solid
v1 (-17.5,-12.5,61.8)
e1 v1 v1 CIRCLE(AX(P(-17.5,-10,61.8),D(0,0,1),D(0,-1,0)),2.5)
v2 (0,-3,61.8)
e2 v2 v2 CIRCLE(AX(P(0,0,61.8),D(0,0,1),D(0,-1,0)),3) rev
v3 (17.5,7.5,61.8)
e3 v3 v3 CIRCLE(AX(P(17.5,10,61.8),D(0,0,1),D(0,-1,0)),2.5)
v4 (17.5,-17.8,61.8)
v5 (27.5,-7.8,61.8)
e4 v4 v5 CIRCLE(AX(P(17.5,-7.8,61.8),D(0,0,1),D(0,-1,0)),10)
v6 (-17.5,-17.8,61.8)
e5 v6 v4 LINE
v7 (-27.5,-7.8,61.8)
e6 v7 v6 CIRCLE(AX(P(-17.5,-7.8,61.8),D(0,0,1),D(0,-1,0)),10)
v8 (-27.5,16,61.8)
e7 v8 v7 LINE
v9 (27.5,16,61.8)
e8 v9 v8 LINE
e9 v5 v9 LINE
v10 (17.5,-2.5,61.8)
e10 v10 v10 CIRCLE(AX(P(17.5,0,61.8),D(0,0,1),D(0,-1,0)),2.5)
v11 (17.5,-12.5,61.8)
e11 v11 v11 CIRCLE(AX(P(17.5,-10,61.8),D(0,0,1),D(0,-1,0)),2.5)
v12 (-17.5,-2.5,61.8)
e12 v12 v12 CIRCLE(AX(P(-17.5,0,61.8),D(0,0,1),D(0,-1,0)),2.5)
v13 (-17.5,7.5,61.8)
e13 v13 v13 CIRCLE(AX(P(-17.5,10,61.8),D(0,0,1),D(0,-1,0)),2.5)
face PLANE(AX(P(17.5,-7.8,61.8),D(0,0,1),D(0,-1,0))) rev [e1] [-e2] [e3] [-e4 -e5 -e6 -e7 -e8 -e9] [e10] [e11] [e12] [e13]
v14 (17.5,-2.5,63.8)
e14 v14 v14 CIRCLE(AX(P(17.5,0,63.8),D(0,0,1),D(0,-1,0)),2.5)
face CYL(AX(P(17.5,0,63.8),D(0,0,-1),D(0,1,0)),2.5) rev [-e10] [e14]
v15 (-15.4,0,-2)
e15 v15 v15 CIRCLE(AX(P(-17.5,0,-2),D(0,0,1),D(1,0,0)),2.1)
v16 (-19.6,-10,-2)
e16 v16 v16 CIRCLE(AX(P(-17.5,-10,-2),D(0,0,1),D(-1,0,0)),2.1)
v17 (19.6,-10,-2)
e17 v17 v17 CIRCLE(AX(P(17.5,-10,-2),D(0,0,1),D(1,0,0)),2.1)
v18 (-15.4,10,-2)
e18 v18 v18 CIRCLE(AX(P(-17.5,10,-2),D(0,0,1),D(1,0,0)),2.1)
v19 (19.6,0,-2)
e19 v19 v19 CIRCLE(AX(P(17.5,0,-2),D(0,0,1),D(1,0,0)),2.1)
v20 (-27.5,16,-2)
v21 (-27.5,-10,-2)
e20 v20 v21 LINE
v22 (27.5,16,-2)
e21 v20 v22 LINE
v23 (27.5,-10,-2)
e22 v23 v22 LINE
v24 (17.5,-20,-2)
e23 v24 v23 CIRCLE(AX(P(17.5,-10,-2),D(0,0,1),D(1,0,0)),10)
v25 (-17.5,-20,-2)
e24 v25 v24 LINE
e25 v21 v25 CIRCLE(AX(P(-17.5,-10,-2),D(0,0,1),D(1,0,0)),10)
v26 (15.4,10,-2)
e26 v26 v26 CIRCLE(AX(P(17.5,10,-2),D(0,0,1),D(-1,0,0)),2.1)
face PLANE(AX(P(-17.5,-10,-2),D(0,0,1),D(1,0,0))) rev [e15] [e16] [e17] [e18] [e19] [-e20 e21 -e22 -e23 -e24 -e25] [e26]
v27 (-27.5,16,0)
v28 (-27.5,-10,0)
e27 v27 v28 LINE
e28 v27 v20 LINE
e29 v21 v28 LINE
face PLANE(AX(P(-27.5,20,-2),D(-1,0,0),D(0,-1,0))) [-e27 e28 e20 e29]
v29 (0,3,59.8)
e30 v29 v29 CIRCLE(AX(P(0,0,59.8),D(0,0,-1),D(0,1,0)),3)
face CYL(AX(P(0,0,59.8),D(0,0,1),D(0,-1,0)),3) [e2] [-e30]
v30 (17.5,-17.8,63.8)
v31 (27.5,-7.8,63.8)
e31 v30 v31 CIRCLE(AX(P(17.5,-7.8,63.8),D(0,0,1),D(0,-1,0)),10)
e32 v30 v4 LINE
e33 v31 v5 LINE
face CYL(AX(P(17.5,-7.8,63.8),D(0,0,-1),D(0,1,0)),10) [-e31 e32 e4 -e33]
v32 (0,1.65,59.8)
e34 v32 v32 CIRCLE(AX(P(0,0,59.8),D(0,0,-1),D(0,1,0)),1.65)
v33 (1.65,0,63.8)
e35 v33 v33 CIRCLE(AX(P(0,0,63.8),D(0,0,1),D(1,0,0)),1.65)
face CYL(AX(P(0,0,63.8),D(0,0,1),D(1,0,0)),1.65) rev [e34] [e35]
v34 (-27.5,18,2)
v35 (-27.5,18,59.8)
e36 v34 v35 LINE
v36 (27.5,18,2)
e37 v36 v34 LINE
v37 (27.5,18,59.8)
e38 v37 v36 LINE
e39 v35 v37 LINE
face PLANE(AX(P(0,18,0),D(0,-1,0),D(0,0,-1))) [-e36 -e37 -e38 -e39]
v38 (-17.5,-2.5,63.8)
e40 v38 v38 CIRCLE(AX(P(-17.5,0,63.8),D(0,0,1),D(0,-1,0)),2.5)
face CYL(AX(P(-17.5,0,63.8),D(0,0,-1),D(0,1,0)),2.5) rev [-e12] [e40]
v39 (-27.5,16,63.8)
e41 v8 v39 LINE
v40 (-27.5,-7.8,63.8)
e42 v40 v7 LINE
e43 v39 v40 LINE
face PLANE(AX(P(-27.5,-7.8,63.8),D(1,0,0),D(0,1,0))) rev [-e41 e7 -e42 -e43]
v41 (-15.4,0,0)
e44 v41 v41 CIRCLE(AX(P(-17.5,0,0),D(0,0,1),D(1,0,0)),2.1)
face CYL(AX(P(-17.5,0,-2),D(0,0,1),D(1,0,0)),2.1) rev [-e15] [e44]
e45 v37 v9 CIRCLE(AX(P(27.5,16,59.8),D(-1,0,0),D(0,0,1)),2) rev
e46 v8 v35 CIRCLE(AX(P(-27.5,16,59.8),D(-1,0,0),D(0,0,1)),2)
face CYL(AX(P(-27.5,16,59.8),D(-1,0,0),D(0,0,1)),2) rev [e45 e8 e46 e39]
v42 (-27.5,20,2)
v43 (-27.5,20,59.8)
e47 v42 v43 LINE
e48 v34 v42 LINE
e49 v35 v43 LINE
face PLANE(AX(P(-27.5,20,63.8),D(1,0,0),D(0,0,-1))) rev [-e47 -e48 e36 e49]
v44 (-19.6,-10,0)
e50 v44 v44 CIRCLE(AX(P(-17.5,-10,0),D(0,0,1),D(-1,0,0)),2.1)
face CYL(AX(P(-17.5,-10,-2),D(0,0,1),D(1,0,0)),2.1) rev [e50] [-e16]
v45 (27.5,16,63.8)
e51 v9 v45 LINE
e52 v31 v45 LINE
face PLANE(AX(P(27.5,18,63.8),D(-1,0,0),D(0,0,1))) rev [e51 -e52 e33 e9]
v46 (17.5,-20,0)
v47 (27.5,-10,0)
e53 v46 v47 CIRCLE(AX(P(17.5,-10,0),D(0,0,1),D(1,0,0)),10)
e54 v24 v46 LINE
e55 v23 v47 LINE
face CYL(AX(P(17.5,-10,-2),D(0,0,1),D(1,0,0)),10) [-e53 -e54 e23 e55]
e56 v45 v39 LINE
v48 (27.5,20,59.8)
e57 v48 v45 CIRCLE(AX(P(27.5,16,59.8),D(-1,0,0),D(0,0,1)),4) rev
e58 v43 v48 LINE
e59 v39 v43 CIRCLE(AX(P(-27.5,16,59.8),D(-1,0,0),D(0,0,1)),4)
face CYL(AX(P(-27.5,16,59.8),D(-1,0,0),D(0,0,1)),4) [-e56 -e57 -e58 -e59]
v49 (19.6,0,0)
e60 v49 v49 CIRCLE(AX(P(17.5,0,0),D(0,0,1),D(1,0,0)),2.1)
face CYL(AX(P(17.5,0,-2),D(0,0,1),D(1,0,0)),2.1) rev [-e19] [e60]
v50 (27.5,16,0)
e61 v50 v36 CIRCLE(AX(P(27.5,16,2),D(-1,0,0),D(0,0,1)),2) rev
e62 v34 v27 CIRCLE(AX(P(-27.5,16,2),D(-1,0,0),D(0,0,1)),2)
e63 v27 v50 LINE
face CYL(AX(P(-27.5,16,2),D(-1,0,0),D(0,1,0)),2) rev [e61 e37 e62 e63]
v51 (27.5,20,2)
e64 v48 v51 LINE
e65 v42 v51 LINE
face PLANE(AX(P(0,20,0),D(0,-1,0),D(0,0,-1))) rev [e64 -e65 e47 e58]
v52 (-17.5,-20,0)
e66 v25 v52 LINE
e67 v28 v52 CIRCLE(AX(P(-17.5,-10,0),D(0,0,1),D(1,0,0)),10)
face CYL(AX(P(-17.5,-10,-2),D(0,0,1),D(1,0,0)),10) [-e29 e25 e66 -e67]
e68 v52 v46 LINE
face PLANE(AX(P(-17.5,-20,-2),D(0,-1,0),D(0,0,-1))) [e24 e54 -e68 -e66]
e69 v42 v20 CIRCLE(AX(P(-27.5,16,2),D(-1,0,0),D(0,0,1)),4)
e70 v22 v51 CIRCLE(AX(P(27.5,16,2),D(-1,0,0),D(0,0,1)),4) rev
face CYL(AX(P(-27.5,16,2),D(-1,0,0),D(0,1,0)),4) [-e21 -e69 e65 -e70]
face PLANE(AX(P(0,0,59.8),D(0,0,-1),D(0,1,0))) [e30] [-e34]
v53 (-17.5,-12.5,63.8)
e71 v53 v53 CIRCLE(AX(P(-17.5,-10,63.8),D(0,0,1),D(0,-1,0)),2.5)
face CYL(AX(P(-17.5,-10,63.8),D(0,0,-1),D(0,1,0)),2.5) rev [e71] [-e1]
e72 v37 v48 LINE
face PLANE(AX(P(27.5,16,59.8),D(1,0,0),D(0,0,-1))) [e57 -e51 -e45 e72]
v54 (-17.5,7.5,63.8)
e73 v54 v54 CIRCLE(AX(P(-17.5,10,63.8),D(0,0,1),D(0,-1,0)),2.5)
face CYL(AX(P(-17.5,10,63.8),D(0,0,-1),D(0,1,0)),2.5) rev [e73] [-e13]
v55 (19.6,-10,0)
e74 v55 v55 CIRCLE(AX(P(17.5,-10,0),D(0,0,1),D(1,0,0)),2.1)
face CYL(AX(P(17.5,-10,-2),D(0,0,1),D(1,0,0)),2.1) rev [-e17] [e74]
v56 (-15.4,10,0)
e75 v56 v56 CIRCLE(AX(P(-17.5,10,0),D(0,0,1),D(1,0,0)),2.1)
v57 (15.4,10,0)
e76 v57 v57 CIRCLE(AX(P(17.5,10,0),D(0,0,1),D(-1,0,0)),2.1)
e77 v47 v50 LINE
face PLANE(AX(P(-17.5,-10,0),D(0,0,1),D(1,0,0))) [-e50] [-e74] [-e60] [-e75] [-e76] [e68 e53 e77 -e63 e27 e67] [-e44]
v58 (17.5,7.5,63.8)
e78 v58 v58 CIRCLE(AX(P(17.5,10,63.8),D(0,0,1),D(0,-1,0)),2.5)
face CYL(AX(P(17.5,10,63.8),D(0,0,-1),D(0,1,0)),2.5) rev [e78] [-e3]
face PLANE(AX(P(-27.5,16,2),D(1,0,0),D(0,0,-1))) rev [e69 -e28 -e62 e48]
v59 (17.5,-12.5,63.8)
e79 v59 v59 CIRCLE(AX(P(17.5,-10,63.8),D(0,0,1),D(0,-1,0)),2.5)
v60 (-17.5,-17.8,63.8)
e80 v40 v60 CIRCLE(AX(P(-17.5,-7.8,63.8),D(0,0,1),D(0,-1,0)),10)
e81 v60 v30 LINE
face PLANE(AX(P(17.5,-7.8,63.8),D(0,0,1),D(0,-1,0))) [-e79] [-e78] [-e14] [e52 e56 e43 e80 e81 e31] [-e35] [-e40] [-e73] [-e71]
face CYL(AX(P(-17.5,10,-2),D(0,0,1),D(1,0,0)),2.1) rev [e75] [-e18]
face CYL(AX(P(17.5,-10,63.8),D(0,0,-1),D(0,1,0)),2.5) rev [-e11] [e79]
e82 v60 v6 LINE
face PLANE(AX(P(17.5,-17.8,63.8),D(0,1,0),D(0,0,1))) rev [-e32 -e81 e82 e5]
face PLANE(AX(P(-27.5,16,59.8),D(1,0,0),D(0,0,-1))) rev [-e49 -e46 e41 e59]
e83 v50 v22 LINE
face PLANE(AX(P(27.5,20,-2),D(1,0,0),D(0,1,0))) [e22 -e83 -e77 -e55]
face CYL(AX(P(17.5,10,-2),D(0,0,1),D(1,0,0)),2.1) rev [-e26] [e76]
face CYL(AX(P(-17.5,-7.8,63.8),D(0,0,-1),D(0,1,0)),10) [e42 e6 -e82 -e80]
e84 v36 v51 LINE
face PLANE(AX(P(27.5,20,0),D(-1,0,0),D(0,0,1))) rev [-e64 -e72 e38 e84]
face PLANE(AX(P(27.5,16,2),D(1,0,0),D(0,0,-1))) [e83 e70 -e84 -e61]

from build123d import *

# Parameters (mm, degrees)
SKETCH_1_R                       = 2.1
SM_BASE_FLANGE_1_DEPTH           = 2
SM_EDGE_FLANGE_1_STRIP_W         = 12
SM_EDGE_FLANGE_1_STRIP_H         = 2
SM_EDGE_FLANGE_1_STRIP_CUT_DEPTH = 55
SM_EDGE_FLANGE_1_DEPTH           = 55
SM_EDGE_FLANGE_2_STRIP_W         = 12
SM_EDGE_FLANGE_2_STRIP_H         = 2
SM_EDGE_FLANGE_2_STRIP_CUT_DEPTH = 55
SM_EDGE_FLANGE_2_DEPTH           = 55
SM_EDGE_FLANGE_2_PROFILE_R       = 2.5
SM_EDGE_FLANGE_2_FLAT_DEPTH      = 2
SKETCH_12_R                      = 3
EXTRUDE_1_DEPTH                  = 2
HOLE_WIZARD_M4_1_D               = 3.3
HOLE_WIZARD_M4_1_DEPTH           = 6
HOLE_WIZARD_M4_1_TIP             = 0.991420021


# Sheet-metal steps are written as plain solids
with BuildPart() as part:
    # Sketch 1 → 基体-法兰1 (new body)
    with BuildSketch(Plane.XY):
        with BuildLine():
            Line((-27.5, 20), (27.5, 20))
            Line((27.5, 20), (27.5, -10))
            ThreePointArc((27.5, -10), (24.571067812, -17.071067812), (17.5, -20))
            Line((17.5, -20), (-17.5, -20))
            ThreePointArc((-17.5, -20), (-24.571067812, -17.071067812), (-27.5, -10))
            Line((-27.5, -10), (-27.5, 20))
        make_face()
        with Locations((-17.5, 10)):
            Circle(SKETCH_1_R, mode=Mode.SUBTRACT)
        with Locations(Location((17.5, 10, 0), (0, 0, 180))):
            Circle(SKETCH_1_R, mode=Mode.SUBTRACT)
        with Locations((17.5, -10)):
            Circle(SKETCH_1_R, mode=Mode.SUBTRACT)
        with Locations(Location((-17.5, -10, 0), (0, 0, 180))):
            Circle(SKETCH_1_R, mode=Mode.SUBTRACT)
        with Locations((-17.5, 0)):
            Circle(SKETCH_1_R, mode=Mode.SUBTRACT)
        with Locations((17.5, 0)):
            Circle(SKETCH_1_R, mode=Mode.SUBTRACT)
    extrude(amount=-SM_BASE_FLANGE_1_DEPTH)

    # 边线-法兰1 strip (across the edge) → 边线-法兰1 strip cut (cut)
    with BuildSketch(Plane(origin=(27.5, 20, 0), x_dir=(0, -1, 0), z_dir=(-1, 0, 0))):
        with Locations((-2, -1)):
            Rectangle(SM_EDGE_FLANGE_1_STRIP_W, SM_EDGE_FLANGE_1_STRIP_H)
    extrude(amount=SM_EDGE_FLANGE_1_STRIP_CUT_DEPTH, mode=Mode.SUBTRACT)

    # 边线-法兰1 section (across the edge) → 边线-法兰1 (add)
    with BuildSketch(Plane(origin=(27.5, 20, 0), x_dir=(0, -1, 0), z_dir=(-1, 0, 0))):
        with BuildLine():
            Line((0, 2), (0, 63.8))
            Line((0, 63.8), (2, 63.8))
            Line((2, 63.8), (2, 2))
            ThreePointArc((2, 2), (2.585786438, 0.585786438), (4, 0))
            Line((4, 0), (4, -2))
            ThreePointArc((4, -2), (1.171572875, -0.828427125), (0, 2))
        make_face()
    extrude(amount=SM_EDGE_FLANGE_1_DEPTH)

    # 边线-法兰2 strip (across the edge) → 边线-法兰2 strip cut (cut)
    with BuildSketch(Plane(origin=(27.5, 18, 63.8), x_dir=(0, 0, -1), z_dir=(-1, 0, 0))):
        with Locations((-2, -1)):
            Rectangle(SM_EDGE_FLANGE_2_STRIP_W, SM_EDGE_FLANGE_2_STRIP_H)
    extrude(amount=SM_EDGE_FLANGE_2_STRIP_CUT_DEPTH, mode=Mode.SUBTRACT)

    # 边线-法兰2 bend section (across the edge) → 边线-法兰2 (add)
    with BuildSketch(Plane(origin=(27.5, 18, 63.8), x_dir=(0, 0, -1), z_dir=(-1, 0, 0))):
        with BuildLine():
            Line((0, 2), (2, 2))
            ThreePointArc((2, 2), (2.585786438, 0.585786438), (4, 0))
            Line((4, 0), (4, -2))
            ThreePointArc((4, -2), (1.171572875, -0.828427125), (0, 2))
        make_face()
    extrude(amount=SM_EDGE_FLANGE_2_DEPTH)

    # 边线-法兰2 profile (on flange) → 边线-法兰2 flat (add)
    with BuildSketch(Plane(origin=(0, 18, 63.8), x_dir=(-1, 0, 0), z_dir=(0, 0, 1))):
        with BuildLine():
            Line((-27.5, 2), (27.5, 2))
            Line((27.5, 2), (27.5, 25.8))
            ThreePointArc((27.5, 25.8), (24.571067812, 32.871067812), (17.5, 35.8))
            Line((17.5, 35.8), (-17.5, 35.8))
            ThreePointArc((-17.5, 35.8), (-24.571067812, 32.871067812), (-27.5, 25.8))
            Line((-27.5, 25.8), (-27.5, 2))
        make_face()
        with Locations((17.5, 8)):
            Circle(SM_EDGE_FLANGE_2_PROFILE_R, mode=Mode.SUBTRACT)
        with Locations((17.5, 18)):
            Circle(SM_EDGE_FLANGE_2_PROFILE_R, mode=Mode.SUBTRACT)
        with Locations((-17.5, 8)):
            Circle(SM_EDGE_FLANGE_2_PROFILE_R, mode=Mode.SUBTRACT)
        with Locations((-17.5, 18)):
            Circle(SM_EDGE_FLANGE_2_PROFILE_R, mode=Mode.SUBTRACT)
        with Locations((17.5, 28)):
            Circle(SM_EDGE_FLANGE_2_PROFILE_R, mode=Mode.SUBTRACT)
        with Locations((-17.5, 28)):
            Circle(SM_EDGE_FLANGE_2_PROFILE_R, mode=Mode.SUBTRACT)
    extrude(amount=-SM_EDGE_FLANGE_2_FLAT_DEPTH)

    # 草图12 → 凸台-拉伸1 (add)
    with BuildSketch(Plane(origin=(0, 0, 61.8), x_dir=(-1, 0, 0), z_dir=(0, 0, -1))):
        with Locations(Location((0, 0, 0), (0, 0, 270))):
            Circle(SKETCH_12_R)
    extrude(amount=EXTRUDE_1_DEPTH)

    # M4 螺纹孔1
    with Locations(Plane.XY.offset(63.8)):
        with Locations((0, 0)):
            Hole(HOLE_WIZARD_M4_1_D / 2, depth=HOLE_WIZARD_M4_1_DEPTH)
            with Locations((0, 0, -(HOLE_WIZARD_M4_1_DEPTH + HOLE_WIZARD_M4_1_TIP / 2))):  # 118° drill point
                Cone(0, HOLE_WIZARD_M4_1_D / 2, HOLE_WIZARD_M4_1_TIP, mode=Mode.SUBTRACT)


solid = part.part
